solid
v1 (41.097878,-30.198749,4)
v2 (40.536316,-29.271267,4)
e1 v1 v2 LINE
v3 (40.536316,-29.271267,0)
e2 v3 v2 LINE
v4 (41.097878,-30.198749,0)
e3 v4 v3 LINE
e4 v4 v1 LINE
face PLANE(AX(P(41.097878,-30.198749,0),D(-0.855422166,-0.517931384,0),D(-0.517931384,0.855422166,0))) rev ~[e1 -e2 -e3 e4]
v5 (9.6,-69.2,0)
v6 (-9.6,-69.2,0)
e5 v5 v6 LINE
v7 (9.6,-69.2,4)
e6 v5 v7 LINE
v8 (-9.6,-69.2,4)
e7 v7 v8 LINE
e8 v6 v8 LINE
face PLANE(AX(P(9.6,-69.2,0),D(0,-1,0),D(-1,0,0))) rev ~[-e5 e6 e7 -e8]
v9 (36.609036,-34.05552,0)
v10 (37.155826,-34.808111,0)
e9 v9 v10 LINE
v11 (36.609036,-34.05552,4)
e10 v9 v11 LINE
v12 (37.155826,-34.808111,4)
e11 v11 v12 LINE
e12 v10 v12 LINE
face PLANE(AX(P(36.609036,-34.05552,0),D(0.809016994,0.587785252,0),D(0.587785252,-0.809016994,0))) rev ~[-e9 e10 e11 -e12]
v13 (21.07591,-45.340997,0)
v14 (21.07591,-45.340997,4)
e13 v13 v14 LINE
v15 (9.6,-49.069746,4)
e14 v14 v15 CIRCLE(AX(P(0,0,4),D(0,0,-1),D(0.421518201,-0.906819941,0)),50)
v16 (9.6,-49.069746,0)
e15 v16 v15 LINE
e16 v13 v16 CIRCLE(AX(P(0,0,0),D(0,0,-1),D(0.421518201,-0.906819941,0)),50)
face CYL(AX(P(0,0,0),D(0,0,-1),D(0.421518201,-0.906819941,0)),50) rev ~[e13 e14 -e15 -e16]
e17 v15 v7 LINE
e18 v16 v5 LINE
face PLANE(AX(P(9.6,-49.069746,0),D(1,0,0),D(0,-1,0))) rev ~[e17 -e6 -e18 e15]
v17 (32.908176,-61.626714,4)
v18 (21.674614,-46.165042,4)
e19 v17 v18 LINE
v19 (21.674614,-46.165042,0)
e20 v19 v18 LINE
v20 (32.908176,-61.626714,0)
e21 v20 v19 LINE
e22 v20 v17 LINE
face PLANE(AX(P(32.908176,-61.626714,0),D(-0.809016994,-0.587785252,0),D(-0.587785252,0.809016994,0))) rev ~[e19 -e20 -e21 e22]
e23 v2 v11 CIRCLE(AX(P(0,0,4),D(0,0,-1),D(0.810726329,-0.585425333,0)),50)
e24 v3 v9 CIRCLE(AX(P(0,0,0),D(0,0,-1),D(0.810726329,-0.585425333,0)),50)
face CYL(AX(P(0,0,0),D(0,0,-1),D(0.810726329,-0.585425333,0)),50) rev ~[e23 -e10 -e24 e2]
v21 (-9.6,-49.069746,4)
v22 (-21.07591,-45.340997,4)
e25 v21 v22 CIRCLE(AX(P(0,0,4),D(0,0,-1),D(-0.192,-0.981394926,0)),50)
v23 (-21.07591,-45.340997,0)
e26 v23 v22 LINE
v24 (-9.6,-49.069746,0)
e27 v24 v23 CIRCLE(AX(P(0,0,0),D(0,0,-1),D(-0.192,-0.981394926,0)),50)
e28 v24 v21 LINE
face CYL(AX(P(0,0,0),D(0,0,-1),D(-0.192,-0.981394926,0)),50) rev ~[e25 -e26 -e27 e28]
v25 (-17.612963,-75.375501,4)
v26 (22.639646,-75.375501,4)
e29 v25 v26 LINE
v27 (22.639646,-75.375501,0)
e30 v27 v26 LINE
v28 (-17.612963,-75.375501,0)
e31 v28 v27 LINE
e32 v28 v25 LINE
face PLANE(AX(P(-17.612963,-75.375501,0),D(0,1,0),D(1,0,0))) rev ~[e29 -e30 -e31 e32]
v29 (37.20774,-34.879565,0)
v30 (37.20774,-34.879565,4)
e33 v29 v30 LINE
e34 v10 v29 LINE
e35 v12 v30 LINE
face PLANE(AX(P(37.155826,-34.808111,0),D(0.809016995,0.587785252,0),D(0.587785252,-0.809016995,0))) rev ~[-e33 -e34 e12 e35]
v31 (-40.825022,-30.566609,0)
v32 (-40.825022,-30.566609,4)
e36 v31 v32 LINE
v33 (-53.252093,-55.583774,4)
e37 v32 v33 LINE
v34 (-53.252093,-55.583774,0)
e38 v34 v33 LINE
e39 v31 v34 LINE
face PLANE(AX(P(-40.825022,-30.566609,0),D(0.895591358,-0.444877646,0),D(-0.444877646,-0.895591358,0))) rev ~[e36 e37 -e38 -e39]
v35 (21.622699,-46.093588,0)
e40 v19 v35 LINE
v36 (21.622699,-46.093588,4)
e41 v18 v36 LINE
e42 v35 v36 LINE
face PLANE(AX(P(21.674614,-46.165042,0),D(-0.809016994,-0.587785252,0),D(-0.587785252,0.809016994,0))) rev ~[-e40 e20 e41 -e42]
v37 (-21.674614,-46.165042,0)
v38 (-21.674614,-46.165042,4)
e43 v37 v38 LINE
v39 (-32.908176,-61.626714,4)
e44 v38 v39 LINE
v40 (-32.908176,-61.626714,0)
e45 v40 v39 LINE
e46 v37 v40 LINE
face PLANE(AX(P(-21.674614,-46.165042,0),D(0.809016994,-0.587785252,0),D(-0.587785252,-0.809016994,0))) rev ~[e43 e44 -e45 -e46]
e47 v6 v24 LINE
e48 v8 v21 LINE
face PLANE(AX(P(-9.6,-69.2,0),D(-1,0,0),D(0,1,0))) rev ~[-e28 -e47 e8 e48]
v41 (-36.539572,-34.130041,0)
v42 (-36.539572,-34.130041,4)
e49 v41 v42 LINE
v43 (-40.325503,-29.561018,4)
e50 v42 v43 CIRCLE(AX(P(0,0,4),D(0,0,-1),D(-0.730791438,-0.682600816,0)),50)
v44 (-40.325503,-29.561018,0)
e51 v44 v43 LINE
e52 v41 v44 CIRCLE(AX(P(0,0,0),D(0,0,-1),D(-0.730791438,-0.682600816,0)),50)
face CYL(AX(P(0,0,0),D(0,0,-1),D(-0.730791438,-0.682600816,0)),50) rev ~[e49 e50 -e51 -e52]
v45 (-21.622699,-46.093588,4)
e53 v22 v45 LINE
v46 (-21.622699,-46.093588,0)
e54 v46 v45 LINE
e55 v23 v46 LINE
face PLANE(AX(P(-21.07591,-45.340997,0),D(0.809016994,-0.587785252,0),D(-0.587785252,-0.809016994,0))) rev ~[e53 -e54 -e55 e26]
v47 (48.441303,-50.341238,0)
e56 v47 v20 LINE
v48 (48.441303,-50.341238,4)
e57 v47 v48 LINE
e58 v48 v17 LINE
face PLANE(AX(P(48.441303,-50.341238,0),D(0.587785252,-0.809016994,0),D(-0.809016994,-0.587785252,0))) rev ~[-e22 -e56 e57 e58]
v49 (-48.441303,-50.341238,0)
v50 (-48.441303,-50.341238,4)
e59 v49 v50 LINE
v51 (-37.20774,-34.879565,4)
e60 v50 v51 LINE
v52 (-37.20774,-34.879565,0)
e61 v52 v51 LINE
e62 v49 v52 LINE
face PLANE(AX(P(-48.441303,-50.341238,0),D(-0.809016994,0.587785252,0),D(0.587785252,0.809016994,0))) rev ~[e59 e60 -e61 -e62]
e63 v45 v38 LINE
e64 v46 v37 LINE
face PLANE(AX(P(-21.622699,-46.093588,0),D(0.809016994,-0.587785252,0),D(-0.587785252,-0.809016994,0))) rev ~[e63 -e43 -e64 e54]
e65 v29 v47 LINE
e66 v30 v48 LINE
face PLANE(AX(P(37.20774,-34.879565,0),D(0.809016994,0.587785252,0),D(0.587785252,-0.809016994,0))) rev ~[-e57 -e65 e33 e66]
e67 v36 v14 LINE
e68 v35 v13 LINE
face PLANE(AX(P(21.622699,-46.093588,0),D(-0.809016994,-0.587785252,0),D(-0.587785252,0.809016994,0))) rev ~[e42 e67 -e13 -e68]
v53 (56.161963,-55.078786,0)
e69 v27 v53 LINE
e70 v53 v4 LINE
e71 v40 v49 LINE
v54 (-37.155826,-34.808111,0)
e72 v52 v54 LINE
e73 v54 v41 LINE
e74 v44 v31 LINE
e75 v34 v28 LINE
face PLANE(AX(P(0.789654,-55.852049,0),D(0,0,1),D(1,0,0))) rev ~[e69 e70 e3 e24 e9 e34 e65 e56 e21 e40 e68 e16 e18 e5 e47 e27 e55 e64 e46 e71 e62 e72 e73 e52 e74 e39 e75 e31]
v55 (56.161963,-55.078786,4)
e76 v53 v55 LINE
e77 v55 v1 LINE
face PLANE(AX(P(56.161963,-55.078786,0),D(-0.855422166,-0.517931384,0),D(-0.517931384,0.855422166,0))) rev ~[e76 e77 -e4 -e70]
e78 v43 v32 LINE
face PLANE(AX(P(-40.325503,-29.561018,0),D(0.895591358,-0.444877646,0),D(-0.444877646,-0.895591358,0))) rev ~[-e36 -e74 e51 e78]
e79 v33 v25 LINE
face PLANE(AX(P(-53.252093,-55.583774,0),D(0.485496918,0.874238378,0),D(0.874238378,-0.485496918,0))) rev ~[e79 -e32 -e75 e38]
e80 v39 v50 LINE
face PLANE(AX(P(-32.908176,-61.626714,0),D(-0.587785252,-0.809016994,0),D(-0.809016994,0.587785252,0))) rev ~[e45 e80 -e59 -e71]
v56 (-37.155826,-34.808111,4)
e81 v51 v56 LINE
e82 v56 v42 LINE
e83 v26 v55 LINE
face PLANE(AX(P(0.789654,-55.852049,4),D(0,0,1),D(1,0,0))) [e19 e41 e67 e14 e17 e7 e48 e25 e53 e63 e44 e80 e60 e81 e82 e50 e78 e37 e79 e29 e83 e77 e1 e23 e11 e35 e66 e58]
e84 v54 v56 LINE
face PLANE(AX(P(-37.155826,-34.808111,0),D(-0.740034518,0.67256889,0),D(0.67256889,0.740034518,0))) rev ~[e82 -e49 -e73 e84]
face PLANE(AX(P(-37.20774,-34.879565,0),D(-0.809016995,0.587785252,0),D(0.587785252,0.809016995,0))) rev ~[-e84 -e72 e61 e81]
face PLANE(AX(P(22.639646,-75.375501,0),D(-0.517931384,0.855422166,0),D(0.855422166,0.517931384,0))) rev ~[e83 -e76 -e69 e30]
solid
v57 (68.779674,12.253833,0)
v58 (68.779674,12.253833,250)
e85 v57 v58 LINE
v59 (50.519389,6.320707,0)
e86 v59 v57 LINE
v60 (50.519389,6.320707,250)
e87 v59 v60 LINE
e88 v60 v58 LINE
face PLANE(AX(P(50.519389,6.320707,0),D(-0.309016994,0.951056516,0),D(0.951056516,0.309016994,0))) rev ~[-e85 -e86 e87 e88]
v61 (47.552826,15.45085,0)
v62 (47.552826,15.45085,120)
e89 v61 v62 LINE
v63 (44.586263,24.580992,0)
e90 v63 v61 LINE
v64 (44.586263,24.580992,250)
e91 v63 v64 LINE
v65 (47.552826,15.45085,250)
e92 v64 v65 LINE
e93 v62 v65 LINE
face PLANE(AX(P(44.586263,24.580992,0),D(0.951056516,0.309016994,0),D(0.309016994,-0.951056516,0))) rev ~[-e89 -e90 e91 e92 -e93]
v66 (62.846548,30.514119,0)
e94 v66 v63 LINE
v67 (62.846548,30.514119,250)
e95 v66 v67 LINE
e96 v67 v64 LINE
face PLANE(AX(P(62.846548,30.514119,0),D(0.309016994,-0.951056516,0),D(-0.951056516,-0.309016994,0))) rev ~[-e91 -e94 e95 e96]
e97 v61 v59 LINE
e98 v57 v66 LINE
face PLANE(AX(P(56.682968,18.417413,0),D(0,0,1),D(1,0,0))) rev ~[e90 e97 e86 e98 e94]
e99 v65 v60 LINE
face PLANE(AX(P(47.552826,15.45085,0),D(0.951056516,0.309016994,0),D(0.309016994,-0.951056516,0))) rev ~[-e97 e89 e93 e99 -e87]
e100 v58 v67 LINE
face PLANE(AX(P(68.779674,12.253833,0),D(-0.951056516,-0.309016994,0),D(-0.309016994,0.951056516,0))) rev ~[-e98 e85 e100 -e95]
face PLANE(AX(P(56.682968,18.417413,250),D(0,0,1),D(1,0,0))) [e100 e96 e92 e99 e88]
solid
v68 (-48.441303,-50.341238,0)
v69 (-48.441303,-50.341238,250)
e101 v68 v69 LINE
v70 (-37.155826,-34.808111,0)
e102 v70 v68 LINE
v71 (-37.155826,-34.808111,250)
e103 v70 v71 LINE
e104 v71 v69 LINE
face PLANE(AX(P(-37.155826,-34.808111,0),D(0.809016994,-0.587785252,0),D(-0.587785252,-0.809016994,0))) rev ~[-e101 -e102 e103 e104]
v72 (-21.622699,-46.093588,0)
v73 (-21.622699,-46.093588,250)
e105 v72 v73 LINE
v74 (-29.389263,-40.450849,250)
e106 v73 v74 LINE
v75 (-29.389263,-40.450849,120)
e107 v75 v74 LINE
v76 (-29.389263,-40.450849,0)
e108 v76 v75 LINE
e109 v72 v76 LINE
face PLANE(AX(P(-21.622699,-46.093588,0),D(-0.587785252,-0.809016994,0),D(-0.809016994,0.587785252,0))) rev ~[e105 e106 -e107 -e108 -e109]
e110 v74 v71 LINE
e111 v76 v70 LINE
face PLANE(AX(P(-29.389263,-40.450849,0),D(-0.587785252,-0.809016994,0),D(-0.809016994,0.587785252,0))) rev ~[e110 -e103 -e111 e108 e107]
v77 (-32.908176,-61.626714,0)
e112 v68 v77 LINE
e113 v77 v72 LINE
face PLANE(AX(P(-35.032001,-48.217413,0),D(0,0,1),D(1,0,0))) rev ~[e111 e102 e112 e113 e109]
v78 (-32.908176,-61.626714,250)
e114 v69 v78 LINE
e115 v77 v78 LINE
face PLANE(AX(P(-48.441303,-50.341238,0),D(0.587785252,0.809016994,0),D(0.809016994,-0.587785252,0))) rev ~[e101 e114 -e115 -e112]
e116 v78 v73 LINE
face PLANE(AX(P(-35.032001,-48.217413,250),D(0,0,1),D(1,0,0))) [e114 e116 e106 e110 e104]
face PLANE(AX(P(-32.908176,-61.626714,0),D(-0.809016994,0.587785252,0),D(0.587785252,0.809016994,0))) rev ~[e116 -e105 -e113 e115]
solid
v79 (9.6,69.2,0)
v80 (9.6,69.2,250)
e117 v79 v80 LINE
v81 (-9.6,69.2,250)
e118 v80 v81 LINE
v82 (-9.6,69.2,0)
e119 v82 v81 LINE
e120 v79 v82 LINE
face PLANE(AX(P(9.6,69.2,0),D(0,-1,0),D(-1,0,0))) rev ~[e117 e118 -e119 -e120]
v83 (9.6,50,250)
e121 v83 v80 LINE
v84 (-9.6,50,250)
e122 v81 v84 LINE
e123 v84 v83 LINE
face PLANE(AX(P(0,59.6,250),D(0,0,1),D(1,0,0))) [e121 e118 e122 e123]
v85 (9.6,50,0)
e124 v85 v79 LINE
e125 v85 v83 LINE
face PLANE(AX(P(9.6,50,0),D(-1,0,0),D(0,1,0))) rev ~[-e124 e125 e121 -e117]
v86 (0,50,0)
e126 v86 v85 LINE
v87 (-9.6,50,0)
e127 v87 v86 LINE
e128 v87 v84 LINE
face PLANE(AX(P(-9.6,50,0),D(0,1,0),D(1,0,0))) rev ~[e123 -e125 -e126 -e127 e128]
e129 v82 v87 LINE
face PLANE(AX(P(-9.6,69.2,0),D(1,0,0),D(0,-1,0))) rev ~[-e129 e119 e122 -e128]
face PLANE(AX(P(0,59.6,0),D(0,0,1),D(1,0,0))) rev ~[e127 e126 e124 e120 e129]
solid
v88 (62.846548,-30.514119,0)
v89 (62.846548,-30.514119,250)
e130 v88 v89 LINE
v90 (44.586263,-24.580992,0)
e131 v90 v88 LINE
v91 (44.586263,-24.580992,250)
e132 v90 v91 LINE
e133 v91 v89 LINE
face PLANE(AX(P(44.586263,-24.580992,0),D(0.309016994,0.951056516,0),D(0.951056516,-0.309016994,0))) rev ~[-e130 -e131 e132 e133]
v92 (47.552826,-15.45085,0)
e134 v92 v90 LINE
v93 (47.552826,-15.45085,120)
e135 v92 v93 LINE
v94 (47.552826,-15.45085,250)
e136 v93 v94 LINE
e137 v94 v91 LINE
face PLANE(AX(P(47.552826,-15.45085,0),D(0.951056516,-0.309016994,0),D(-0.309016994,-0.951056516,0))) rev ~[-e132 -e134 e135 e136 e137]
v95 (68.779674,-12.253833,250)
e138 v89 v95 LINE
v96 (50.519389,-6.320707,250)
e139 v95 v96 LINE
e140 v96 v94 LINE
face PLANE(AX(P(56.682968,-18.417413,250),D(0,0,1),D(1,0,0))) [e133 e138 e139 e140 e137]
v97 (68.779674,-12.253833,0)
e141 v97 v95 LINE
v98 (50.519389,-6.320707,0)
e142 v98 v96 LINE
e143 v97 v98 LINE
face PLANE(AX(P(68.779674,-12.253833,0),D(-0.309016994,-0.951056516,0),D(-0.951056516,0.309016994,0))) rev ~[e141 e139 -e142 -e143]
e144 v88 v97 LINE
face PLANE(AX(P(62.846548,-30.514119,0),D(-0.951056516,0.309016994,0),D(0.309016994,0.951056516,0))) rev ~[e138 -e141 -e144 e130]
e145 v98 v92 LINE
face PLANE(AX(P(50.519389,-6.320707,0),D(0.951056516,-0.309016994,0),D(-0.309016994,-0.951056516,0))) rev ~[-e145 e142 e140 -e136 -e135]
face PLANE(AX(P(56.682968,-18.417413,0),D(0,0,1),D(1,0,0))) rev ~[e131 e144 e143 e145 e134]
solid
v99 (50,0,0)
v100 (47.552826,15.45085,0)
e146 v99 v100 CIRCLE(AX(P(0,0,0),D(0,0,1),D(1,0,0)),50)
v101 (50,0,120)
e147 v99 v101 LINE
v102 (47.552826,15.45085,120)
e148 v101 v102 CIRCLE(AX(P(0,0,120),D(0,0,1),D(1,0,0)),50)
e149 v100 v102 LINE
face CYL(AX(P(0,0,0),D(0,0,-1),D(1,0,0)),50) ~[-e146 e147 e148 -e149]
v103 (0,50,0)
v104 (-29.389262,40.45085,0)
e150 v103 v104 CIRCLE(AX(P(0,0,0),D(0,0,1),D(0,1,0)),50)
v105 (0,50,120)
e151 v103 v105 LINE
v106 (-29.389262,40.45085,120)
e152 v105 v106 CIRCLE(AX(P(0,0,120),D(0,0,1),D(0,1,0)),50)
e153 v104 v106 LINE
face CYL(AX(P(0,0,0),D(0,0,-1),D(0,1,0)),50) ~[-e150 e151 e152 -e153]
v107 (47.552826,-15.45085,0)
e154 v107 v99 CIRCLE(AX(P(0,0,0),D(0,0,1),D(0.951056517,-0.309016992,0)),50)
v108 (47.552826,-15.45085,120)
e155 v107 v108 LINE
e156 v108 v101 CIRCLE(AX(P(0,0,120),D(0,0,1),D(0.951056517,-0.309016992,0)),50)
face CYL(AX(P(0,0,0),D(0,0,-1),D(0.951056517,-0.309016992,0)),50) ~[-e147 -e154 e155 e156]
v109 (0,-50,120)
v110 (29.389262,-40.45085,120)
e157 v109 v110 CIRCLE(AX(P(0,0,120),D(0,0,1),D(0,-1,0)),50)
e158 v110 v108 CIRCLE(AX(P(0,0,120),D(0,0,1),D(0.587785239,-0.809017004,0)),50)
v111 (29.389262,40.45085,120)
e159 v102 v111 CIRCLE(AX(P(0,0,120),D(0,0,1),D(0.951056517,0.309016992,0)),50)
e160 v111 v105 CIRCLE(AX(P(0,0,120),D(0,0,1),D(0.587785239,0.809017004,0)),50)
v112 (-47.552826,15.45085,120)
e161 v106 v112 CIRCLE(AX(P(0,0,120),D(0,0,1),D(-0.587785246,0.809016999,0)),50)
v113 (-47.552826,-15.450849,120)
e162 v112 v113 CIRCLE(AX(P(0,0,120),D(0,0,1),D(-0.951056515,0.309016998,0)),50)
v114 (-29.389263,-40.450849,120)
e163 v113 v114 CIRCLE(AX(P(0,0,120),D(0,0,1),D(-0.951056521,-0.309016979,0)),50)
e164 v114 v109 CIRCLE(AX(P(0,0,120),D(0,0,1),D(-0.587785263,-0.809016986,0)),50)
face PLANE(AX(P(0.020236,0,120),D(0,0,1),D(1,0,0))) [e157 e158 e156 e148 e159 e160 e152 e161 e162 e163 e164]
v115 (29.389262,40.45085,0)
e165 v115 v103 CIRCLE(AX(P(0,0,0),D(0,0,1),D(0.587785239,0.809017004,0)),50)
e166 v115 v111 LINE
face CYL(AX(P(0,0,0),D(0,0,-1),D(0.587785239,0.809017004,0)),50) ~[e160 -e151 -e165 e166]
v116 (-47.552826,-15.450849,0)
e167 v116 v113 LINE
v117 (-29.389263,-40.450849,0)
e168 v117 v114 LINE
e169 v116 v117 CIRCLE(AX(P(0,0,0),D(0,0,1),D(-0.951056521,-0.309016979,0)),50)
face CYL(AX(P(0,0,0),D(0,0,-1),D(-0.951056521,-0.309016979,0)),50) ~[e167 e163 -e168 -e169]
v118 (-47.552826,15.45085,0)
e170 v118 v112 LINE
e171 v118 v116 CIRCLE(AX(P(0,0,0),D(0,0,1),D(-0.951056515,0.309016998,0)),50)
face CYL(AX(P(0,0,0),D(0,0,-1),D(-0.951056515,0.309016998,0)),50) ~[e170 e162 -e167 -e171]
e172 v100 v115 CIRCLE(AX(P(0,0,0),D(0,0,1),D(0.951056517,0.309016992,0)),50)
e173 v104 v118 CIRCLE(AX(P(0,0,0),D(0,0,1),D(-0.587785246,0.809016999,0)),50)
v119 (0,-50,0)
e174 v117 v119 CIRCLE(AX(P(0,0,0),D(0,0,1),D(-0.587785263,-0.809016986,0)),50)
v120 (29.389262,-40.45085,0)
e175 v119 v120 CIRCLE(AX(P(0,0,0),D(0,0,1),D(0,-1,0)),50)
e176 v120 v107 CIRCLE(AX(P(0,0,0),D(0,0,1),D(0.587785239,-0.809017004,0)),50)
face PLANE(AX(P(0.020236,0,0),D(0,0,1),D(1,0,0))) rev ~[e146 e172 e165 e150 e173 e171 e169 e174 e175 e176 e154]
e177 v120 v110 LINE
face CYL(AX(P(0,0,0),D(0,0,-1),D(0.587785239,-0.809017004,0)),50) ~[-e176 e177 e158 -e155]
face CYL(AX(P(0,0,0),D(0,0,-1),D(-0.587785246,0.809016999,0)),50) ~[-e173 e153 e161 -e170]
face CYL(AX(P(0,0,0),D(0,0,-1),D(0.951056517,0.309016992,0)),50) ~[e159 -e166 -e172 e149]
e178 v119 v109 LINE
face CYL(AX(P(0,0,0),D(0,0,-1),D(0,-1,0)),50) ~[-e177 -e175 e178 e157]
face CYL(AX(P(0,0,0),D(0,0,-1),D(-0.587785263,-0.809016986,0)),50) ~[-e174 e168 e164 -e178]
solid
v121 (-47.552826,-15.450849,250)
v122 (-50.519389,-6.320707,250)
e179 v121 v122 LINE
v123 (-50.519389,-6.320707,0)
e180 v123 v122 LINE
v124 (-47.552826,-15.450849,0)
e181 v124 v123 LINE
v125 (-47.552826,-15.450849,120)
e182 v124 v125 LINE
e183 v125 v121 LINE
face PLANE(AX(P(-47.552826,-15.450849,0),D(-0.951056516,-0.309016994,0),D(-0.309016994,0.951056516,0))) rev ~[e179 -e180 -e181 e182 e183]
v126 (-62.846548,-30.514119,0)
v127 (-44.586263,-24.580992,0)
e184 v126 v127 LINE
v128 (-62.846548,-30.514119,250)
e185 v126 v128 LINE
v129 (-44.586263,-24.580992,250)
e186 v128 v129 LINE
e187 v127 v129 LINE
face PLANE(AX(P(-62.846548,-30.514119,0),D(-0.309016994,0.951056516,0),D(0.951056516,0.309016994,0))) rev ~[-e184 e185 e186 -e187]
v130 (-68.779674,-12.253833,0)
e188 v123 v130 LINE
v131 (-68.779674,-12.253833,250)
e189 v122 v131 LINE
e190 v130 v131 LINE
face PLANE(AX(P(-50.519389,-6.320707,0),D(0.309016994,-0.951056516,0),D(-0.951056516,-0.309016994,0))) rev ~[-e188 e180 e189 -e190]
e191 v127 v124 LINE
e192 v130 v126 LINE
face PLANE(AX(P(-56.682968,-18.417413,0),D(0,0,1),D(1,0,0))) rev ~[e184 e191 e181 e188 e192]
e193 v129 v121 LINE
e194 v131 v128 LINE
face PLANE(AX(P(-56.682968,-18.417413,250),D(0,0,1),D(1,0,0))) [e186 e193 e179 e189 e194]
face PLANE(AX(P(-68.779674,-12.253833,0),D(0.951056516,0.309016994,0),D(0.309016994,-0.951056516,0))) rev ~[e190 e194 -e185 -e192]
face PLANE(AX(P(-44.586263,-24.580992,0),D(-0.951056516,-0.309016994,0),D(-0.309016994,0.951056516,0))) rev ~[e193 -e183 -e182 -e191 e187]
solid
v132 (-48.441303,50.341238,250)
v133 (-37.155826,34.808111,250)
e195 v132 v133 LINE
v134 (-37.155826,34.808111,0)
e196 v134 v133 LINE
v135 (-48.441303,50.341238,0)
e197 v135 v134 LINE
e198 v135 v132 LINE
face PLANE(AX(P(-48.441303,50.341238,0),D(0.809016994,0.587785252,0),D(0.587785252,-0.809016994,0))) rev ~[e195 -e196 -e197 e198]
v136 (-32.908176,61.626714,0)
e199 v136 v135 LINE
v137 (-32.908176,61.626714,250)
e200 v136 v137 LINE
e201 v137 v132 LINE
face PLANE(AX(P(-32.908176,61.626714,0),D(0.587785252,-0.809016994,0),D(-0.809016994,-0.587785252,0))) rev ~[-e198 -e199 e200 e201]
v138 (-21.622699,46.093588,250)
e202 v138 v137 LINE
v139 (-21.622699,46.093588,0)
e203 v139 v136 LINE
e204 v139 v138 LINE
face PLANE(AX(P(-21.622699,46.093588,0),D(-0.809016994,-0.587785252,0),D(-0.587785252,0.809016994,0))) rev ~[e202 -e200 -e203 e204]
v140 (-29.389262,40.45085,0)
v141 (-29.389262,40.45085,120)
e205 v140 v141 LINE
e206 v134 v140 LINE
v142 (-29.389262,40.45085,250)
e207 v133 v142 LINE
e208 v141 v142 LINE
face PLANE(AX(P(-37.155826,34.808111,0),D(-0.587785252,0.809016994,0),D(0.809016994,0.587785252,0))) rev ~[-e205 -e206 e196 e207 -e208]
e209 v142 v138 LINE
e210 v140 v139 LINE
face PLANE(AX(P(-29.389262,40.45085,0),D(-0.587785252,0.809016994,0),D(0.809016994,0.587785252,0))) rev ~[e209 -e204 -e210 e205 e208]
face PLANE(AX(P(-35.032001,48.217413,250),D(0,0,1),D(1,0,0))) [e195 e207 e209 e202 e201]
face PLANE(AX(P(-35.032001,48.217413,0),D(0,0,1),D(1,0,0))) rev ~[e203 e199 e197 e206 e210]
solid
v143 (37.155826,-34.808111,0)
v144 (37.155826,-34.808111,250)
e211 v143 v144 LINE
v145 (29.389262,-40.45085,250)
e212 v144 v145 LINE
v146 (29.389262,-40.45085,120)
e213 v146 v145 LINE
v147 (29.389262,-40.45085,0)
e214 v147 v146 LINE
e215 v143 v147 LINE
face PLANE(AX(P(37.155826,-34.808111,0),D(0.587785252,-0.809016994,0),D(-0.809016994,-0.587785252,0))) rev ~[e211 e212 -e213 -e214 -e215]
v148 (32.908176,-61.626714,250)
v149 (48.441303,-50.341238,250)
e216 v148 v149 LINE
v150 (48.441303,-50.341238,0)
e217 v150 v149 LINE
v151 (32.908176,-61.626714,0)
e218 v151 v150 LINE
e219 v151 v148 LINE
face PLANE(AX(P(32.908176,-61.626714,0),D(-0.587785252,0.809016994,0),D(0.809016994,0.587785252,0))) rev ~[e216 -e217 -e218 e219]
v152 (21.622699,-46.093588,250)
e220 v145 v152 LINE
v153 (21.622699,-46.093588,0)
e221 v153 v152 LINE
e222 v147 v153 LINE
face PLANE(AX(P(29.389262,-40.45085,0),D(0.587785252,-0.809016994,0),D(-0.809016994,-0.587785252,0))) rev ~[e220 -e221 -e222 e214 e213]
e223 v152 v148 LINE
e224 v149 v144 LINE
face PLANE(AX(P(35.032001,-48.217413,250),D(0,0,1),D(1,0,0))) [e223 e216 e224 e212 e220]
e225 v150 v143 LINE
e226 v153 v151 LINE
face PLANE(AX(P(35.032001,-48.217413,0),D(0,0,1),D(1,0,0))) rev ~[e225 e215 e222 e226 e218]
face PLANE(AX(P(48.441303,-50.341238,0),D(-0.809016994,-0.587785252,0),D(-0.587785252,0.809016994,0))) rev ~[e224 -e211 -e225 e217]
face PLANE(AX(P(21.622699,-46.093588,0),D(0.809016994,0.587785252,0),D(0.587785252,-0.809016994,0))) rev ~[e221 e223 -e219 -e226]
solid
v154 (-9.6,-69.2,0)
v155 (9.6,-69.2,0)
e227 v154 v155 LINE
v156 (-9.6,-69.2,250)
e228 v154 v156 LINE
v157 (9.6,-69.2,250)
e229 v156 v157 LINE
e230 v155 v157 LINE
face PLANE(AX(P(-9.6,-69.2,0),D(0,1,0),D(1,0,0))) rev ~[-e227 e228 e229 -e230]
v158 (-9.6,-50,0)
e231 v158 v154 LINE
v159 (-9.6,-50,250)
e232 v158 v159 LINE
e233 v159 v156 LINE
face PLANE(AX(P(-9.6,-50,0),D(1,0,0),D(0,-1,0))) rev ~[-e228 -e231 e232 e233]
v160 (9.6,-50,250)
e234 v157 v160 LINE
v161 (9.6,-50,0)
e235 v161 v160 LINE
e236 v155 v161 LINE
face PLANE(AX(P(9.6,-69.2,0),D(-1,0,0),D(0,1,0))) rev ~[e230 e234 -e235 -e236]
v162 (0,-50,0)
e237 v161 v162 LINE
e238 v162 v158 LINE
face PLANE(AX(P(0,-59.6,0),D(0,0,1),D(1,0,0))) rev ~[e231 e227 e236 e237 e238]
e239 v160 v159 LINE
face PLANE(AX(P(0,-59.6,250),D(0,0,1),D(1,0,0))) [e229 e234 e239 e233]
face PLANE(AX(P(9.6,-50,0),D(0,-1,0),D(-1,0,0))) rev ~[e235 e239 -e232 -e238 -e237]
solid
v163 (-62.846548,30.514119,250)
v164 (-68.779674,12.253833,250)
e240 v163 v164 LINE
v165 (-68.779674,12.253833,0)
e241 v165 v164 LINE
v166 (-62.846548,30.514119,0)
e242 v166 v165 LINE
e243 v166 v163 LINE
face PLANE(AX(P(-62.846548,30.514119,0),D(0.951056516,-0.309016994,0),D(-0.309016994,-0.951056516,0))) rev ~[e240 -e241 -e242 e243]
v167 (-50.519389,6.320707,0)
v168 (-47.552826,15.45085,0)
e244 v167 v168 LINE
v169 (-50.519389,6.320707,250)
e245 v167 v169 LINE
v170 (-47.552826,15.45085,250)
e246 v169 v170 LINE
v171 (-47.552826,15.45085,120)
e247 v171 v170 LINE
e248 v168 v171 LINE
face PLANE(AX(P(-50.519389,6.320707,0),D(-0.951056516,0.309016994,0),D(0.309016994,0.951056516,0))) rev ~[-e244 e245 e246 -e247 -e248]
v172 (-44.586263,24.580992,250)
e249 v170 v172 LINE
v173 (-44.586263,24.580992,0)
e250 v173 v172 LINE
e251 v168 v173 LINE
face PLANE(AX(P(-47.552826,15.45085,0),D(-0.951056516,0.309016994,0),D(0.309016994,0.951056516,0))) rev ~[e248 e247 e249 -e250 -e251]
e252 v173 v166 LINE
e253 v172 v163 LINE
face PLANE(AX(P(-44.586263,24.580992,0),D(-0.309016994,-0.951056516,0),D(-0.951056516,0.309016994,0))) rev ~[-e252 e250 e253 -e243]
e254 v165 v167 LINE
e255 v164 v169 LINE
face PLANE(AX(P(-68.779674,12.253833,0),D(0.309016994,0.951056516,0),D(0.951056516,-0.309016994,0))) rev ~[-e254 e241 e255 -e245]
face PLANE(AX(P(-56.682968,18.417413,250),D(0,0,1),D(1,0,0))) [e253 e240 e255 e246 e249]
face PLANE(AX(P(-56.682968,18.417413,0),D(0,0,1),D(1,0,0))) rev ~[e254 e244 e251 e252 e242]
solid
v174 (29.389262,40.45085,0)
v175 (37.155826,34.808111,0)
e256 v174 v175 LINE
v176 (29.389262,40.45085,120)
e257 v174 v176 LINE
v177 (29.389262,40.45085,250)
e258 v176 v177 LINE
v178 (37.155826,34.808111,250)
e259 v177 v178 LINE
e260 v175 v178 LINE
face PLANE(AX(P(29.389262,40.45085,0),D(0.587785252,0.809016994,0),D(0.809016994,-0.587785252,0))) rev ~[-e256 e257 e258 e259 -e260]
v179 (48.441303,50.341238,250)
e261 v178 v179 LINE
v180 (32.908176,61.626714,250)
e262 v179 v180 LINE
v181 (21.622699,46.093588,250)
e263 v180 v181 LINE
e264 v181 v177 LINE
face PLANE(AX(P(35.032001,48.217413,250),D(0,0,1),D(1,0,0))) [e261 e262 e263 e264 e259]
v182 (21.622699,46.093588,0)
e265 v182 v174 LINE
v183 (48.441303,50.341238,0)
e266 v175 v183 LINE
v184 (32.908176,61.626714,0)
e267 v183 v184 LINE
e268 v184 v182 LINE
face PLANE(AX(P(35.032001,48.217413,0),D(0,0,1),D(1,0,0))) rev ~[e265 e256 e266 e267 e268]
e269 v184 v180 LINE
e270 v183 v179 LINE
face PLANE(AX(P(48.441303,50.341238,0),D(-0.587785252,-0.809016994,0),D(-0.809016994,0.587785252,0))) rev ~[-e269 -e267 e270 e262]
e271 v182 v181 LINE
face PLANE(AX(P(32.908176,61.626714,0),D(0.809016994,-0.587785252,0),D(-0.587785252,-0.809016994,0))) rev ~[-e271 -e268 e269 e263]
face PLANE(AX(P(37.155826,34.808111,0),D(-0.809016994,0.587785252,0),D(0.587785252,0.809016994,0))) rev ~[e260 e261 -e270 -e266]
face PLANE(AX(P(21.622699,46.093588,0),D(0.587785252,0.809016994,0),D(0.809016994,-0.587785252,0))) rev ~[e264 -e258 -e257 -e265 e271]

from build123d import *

# Parameters (mm, degrees)
F1_DEPTH = 120
F2_DEPTH = 250
F4_DEPTH = 4


# Not quite as in the source:
# - a feature names something its author has since deleted; it is built from what else it names


with BuildPart() as f1:
    # F0 (on Top) → F1 (new body)
    with BuildSketch(Plane.XY):
        with BuildLine():
            ThreePointArc((47.5528258507, -15.4508496082), (49.3844170388, -7.8217231946), (50, 0))
            ThreePointArc((50, 0), (49.3844170388, 7.8217231946), (47.5528258507, 15.4508496082))
            ThreePointArc((47.5528258507, 15.4508496082), (40.4508495047, 29.3892629092), (29.3892619315, 40.450850215))
            ThreePointArc((29.3892619315, 40.450850215), (15.4508493172, 47.5528259452), (0, 50))
            ThreePointArc((0, 50), (-15.450849525, 47.5528258777), (-29.389262285, 40.4508499582))
            ThreePointArc((-29.389262285, 40.4508499582), (-40.4508495406, 29.3892628598), (-47.5528257534, 15.4508499077))
            ThreePointArc((-47.5528257534, 15.4508499077), (-50, 5.095e-07), (-47.5528260682, -15.4508489386))
            ThreePointArc((-47.5528260682, -15.4508489386), (-40.4508501628, -29.3892620034), (-29.3892631734, -40.4508493128))
            ThreePointArc((-29.3892631734, -40.4508493128), (-15.4508500472, -47.552825708), (0, -50))
            ThreePointArc((0, -50), (15.4508493172, -47.5528259452), (29.3892619315, -40.4508502151))
            ThreePointArc((29.3892619315, -40.4508502151), (40.4508495047, -29.3892629092), (47.5528258507, -15.4508496082))
        make_face()
    extrude(amount=F1_DEPTH)

    # F0 (on Top) → F2 (join)
    with BuildSketch(Plane.XY):
        Polygon((-21.6226994686, -46.0935881408), (-29.3892631734, -40.4508493128), (-37.1558257606, -34.8081112967), (-48.4413026046, -50.3412375887), (-32.9081763126, -61.6267144328), align=None)
        Polygon((-44.5862626688, -24.5809922752), (-47.5528260682, -15.4508489386), (-50.5193889608, -6.3207071623), (-68.7796740736, -12.2538334543), (-62.8465477816, -30.5141185672), align=None)
        Polygon((9.6, -50), (0, -50), (-9.6, -50), (-9.6, -69.2), (9.6, -69.2), align=None)
        Polygon((37.1558257606, -34.8081112967), (29.3892619315, -40.4508502151), (21.6226994686, -46.0935881408), (32.9081763126, -61.6267144328), (48.4413026046, -50.3412375887), align=None)
        Polygon((50.5193889608, -6.3207071623), (47.5528258507, -15.4508496082), (44.5862626688, -24.5809922752), (62.8465477816, -30.5141185672), (68.7796740736, -12.2538334543), align=None)
        Polygon((44.5862626688, 24.5809922752), (47.5528258507, 15.4508496082), (50.5193889608, 6.3207071623), (68.7796740736, 12.2538334543), (62.8465477816, 30.5141185672), align=None)
        Polygon((21.6226994686, 46.0935881408), (29.3892619315, 40.450850215), (37.1558257606, 34.8081112967), (48.4413026046, 50.3412375887), (32.9081763126, 61.6267144328), align=None)
        Polygon((-9.6, 50), (0, 50), (9.6, 50), (9.6, 69.2), (-9.6, 69.2), align=None)
        Polygon((-37.1558257606, 34.8081112967), (-29.389262285, 40.4508499582), (-21.6226994686, 46.0935881408), (-32.9081763126, 61.6267144328), (-48.4413026046, 50.3412375887), align=None)
        Polygon((-50.5193889608, 6.3207071623), (-47.5528257534, 15.4508499077), (-44.5862626688, 24.5809922752), (-62.8465477816, 30.5141185672), (-68.7796740736, 12.2538334543), align=None)
    extrude(amount=F2_DEPTH)


with BuildPart() as f4:
    # F3 (on Top) → F4 (new body)
    with BuildSketch(Plane.XY):
        with BuildLine():
            ThreePointArc((-36.5395719078, -34.1300407969), (-38.5003757753, -31.9017407858), (-40.3255031982, -29.5610181119))
            Line((-40.3255031982, -29.5610181119), (-40.8250220898, -30.5666087646))
            Line((-40.8250220898, -30.5666087646), (-53.2520930962, -55.5837735933))
            Line((-53.2520930962, -55.5837735933), (-17.6129629184, -75.3755012347))
            Line((-17.6129629184, -75.3755012347), (22.63964626, -75.3755012347))
            Line((22.63964626, -75.3755012347), (56.161962921, -55.0787862979))
            Line((56.161962921, -55.0787862979), (41.0978779096, -30.1987488371))
            Line((41.0978779096, -30.1987488371), (40.5363164273, -29.2712666365))
            ThreePointArc((40.5363164273, -29.2712666365), (38.646780385, -31.7242236449), (36.6090363432, -34.0555202283))
            Line((36.6090363432, -34.0555202283), (37.1558257606, -34.8081112967))
            Line((37.1558257606, -34.8081112967), (37.2077401251, -34.8795652895))
            Line((37.2077401251, -34.8795652895), (48.4413026046, -50.3412375887))
            Line((48.4413026046, -50.3412375887), (32.9081763126, -61.6267144328))
            Line((32.9081763126, -61.6267144328), (21.6746138331, -46.1650421335))
            Line((21.6746138331, -46.1650421335), (21.6226994686, -46.0935881408))
            Line((21.6226994686, -46.0935881408), (21.0759100512, -45.3409970723))
            ThreePointArc((21.0759100512, -45.3409970723), (15.4508497187, -47.5528258148), (9.6, -49.0697462802))
            Line((9.6, -49.0697462802), (9.6, -50))
            Line((9.6, -50), (9.6, -69.2))
            Line((9.6, -69.2), (-9.6, -69.2))
            Line((-9.6, -69.2), (-9.6, -50))
            Line((-9.6, -50), (-9.6, -49.0697462802))
            ThreePointArc((-9.6, -49.0697462802), (-15.4508497187, -47.5528258148), (-21.0759100512, -45.3409970723))
            Line((-21.0759100512, -45.3409970723), (-21.6226994686, -46.0935881408))
            Line((-21.6226994686, -46.0935881408), (-21.6746138331, -46.1650421335))
            Line((-21.6746138331, -46.1650421335), (-32.9081763126, -61.6267144328))
            Line((-32.9081763126, -61.6267144328), (-48.4413026046, -50.3412375887))
            Line((-48.4413026046, -50.3412375887), (-37.2077401251, -34.8795652895))
            Line((-37.2077401251, -34.8795652895), (-37.1558257606, -34.8081112967))
            Line((-37.1558257606, -34.8081112967), (-36.5395719078, -34.1300407969))
        make_face()
    extrude(amount=F4_DEPTH)


solid = Compound([f1.part, f4.part])
